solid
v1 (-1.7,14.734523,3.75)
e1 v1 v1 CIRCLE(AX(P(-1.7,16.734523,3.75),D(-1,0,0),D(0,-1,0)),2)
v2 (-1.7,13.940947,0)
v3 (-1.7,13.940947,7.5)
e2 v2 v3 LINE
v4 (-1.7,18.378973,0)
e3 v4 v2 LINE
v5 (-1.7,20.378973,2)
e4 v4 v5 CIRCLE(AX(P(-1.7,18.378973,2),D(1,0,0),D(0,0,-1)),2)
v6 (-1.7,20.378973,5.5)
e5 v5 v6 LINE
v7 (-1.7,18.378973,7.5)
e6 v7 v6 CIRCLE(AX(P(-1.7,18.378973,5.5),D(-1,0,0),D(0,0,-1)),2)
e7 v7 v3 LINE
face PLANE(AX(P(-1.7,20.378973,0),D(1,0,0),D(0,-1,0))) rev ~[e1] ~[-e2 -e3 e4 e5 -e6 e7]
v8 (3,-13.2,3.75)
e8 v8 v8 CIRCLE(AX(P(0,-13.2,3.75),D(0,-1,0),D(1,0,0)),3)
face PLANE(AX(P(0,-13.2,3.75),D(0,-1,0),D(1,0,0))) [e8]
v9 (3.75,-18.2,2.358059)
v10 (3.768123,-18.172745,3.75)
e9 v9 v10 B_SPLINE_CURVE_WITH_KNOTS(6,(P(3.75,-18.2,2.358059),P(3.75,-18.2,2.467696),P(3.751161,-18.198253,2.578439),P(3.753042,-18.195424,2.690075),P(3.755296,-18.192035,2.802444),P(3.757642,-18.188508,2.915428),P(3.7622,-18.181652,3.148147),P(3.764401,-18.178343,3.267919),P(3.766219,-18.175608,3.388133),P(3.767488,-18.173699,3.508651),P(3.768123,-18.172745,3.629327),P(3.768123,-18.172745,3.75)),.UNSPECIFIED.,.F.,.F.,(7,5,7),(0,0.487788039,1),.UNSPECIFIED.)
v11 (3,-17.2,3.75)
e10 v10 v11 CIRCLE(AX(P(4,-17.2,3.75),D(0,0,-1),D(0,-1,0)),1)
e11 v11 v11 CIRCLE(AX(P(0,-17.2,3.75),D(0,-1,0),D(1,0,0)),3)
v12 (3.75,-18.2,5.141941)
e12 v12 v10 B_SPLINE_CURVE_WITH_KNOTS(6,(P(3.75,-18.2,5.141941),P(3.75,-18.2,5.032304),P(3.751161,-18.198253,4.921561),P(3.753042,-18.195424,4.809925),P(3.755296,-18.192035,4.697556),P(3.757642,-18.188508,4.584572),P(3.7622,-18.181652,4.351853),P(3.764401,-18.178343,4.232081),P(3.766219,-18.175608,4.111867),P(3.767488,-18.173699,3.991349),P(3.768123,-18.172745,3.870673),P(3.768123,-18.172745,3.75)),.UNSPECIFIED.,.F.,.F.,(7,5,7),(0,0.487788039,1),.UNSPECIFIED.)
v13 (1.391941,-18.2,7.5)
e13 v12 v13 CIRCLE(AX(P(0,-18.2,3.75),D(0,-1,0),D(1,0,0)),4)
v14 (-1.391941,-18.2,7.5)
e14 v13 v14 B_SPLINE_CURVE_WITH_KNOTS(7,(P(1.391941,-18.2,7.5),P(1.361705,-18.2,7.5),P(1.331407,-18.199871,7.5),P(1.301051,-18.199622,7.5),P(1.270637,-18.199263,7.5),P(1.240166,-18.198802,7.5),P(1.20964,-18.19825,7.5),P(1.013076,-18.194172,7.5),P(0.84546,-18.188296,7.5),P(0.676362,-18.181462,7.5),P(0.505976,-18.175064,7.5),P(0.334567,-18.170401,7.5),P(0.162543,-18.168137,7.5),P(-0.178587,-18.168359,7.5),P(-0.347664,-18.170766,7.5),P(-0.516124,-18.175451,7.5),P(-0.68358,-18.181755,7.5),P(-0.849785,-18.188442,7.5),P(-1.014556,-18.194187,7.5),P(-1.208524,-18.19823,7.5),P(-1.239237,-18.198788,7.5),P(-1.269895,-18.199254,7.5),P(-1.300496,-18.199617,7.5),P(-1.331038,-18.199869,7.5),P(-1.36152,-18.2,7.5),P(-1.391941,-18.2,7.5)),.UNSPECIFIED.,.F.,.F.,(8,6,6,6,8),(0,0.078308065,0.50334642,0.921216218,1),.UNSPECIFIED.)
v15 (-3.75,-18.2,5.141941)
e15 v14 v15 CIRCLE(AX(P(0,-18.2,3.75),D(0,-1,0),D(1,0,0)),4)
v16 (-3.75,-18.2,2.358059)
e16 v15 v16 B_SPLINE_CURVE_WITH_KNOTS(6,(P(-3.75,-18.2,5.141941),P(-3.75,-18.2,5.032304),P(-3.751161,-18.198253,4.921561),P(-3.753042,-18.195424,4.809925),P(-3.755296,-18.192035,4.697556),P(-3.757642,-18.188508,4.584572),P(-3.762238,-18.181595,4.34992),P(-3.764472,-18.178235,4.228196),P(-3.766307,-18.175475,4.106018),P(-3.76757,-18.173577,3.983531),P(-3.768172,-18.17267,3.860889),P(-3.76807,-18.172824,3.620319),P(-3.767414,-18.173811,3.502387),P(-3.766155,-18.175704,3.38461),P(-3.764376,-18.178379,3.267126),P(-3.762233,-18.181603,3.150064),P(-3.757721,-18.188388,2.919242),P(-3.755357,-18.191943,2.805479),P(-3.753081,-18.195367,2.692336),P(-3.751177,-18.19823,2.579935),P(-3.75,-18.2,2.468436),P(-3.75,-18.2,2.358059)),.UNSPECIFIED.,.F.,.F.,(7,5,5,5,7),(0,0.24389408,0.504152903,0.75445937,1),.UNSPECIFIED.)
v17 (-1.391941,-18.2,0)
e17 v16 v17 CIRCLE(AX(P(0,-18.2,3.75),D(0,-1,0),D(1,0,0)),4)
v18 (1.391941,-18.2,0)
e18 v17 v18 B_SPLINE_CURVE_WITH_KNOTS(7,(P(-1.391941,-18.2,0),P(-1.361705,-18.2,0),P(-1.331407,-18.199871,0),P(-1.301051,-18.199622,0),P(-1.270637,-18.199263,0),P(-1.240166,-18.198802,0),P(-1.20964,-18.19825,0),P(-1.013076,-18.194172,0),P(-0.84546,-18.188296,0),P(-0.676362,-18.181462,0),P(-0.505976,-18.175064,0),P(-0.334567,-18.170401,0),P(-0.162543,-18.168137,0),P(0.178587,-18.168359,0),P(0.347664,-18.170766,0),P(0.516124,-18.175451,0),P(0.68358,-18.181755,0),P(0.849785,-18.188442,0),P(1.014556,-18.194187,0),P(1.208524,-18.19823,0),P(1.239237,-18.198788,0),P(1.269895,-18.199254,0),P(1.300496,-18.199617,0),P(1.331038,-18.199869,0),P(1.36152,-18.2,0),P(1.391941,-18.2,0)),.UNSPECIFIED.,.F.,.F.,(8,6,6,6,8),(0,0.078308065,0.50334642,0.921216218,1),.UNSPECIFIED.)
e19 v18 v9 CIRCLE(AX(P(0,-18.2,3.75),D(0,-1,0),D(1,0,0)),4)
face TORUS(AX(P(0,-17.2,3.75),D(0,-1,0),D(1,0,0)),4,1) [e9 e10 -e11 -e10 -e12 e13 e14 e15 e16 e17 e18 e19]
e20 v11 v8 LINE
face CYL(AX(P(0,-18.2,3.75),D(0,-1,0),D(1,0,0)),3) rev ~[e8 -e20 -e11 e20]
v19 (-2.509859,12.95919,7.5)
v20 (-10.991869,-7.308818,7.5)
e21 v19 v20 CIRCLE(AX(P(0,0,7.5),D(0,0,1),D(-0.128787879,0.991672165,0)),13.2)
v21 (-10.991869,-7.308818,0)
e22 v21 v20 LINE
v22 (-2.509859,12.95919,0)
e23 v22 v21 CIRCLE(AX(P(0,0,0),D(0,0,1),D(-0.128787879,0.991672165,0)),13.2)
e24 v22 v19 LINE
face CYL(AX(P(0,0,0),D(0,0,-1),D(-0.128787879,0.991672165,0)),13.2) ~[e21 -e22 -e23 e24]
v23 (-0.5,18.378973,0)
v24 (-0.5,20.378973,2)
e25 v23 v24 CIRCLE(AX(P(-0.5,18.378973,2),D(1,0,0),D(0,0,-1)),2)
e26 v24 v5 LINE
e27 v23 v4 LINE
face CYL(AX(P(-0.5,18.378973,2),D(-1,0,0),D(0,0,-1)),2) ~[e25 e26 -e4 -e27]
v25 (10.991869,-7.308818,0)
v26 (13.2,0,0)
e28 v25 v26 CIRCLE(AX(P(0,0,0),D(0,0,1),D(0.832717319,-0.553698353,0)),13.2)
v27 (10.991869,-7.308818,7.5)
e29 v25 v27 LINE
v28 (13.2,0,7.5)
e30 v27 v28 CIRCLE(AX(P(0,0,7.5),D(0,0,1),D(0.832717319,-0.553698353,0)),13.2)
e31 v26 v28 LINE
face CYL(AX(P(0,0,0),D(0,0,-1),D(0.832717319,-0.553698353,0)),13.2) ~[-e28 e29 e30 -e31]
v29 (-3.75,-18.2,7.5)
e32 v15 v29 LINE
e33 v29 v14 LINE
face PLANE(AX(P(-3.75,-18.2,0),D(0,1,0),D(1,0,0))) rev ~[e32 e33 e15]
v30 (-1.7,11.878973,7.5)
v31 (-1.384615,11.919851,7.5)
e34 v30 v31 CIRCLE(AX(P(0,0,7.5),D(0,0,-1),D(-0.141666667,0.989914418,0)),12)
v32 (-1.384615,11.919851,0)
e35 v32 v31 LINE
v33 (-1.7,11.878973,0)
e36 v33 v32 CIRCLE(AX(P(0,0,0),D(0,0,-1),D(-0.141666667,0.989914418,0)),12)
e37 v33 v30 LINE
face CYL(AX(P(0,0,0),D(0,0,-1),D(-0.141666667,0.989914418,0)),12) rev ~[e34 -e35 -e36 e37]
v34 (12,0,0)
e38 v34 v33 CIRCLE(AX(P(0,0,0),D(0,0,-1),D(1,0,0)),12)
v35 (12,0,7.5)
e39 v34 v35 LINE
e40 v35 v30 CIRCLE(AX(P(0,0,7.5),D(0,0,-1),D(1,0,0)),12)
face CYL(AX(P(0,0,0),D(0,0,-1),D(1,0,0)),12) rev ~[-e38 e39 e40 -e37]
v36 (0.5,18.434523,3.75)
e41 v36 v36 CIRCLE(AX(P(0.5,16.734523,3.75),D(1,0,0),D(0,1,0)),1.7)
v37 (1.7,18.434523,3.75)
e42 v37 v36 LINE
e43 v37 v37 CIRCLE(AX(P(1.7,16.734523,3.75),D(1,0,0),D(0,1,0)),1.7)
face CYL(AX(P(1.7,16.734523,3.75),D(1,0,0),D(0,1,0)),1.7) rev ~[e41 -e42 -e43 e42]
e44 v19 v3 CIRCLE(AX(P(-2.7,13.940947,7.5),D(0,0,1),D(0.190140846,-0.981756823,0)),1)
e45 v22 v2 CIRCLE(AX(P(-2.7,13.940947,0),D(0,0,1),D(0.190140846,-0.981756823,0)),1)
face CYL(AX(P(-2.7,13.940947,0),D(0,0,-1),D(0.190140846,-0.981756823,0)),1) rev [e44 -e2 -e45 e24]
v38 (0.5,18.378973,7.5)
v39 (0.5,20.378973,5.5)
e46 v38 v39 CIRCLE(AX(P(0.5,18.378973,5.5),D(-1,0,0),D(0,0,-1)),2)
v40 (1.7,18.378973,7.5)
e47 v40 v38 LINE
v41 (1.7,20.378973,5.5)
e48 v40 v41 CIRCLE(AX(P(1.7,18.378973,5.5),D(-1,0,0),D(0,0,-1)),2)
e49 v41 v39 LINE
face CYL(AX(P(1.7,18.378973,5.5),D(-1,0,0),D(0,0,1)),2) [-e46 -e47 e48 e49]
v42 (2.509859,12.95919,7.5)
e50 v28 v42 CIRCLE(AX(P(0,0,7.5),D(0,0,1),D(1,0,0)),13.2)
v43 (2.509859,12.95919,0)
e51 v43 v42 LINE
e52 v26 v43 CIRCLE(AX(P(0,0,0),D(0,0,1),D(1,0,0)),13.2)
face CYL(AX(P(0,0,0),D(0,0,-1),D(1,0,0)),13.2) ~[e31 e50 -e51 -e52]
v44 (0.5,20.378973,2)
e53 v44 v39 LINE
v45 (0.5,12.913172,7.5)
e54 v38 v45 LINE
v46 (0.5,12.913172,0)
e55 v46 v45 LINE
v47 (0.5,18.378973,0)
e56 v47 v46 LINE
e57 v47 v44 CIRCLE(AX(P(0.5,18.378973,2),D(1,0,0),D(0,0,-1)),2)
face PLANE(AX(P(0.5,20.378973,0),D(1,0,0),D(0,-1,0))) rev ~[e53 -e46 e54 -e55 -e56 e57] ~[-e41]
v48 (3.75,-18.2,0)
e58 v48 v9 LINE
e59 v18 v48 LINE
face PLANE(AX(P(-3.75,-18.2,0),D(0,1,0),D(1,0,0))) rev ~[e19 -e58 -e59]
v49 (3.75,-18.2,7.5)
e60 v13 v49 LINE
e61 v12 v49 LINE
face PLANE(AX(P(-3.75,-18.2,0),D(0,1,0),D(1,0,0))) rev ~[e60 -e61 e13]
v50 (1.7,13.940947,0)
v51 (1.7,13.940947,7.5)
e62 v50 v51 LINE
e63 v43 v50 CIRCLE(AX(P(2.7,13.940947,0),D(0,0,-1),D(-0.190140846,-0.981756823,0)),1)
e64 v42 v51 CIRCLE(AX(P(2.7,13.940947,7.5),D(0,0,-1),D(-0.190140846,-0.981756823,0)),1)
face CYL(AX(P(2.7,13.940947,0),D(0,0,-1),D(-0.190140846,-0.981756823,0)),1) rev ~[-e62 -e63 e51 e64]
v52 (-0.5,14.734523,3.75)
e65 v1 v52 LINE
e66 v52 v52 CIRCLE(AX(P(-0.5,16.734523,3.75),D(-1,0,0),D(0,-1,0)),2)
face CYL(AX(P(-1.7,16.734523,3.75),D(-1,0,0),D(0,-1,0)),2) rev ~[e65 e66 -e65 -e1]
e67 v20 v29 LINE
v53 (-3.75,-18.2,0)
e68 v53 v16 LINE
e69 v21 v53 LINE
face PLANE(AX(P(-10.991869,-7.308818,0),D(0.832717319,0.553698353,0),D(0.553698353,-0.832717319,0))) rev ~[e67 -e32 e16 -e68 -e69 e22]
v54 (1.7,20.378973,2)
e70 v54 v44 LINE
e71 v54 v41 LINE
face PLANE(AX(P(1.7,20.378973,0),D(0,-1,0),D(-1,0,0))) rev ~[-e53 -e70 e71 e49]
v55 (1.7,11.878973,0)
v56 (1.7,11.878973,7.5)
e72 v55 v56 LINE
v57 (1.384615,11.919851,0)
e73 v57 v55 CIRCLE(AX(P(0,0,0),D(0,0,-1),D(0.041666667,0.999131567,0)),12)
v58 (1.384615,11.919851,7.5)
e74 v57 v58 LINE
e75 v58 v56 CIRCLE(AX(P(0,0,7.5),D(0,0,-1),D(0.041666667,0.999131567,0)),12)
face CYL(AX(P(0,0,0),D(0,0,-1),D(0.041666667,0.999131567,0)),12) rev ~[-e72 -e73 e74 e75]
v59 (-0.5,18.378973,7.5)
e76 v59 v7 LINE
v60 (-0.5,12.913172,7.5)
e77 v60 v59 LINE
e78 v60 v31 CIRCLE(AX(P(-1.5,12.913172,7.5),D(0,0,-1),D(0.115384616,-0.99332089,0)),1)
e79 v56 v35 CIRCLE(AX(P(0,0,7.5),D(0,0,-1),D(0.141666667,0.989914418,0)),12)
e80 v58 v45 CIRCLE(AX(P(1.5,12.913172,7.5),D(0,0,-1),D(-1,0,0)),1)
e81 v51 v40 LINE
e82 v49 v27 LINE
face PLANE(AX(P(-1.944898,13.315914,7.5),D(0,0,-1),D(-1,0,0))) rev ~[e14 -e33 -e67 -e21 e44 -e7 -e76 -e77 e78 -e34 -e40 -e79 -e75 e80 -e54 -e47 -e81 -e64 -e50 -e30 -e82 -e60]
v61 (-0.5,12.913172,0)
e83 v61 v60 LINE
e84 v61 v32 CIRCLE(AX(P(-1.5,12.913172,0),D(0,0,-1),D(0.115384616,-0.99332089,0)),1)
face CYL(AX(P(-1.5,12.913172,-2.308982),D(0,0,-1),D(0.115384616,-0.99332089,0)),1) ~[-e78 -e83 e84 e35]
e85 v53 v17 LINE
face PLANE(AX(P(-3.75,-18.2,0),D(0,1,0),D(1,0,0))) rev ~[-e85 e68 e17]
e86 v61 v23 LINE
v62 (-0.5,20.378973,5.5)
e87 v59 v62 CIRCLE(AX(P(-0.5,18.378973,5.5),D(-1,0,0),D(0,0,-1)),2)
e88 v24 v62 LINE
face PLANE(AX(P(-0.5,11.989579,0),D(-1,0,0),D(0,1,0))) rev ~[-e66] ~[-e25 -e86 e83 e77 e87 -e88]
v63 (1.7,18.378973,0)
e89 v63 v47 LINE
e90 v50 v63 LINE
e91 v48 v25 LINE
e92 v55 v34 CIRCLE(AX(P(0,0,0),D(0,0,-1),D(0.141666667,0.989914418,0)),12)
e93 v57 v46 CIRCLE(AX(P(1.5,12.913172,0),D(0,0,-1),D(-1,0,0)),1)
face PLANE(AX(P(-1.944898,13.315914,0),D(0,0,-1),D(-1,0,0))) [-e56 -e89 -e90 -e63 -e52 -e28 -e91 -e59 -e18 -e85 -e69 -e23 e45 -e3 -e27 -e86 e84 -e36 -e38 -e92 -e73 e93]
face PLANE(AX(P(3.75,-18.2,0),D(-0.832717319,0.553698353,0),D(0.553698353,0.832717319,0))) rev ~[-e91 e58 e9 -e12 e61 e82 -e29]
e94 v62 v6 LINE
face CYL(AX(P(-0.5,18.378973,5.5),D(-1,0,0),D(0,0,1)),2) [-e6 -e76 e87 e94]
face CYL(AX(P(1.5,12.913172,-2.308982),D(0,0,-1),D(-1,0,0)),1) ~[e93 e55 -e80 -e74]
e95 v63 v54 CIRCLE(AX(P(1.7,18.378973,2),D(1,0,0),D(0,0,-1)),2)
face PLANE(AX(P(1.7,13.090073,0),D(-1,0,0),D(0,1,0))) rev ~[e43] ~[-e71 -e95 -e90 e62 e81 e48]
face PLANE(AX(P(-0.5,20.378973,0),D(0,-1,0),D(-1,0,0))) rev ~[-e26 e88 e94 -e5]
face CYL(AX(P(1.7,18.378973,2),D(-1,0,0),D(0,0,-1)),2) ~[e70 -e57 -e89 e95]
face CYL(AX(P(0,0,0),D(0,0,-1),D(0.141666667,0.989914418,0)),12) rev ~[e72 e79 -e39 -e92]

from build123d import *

# Parameters (mm, degrees)
F1_DEPTH    = 7.5
F2_R        = 3
F3_DEPTH    = 5
F4_R        = 2
F5_DEPTH    = 1.2
F6_R        = 1.7
F7_DEPTH    = 1.2
F8_T1_DEPTH = 7.5
F8_T3_DEPTH = 12.1179638093
F9_R        = 2


# Not quite as in the source:
# - a fillet or chamfer that OpenCascade refuses, or shapes differently, is made with other operations: its cross-section is extruded or revolved along the edge and cut away or added


with BuildPart() as f1:
    # F0 (on Top) → F1 (new body)
    with BuildSketch(Plane.XY):
        with BuildLine():
            ThreePointArc((10.9918685576, -7.3088182167), (0, -13.1999999285), (-10.9918685576, -7.3088182167))
            Line((-10.9918685576, -7.3088182167), (-3.75, -18.1999999285))
            Line((-3.75, -18.1999999285), (3.75, -18.1999999285))
            Line((3.75, -18.1999999285), (10.9918685576, -7.3088182167))
        make_face()
        with BuildLine():
            ThreePointArc((1.7, 11.8789730196), (9.0664215653, 7.8612976028), (12, 0))
            ThreePointArc((12, 0), (-7.8612976028, -9.0664215653), (-1.7, 11.8789730196))
            Line((-1.7, 11.8789730196), (-1.7, 13.0900725022))
            ThreePointArc((-1.7, 13.0900725022), (-12.0124754947, 5.4717849557), (-10.9918685576, -7.3088182167))
            ThreePointArc((-10.9918685576, -7.3088182167), (0, -13.1999999285), (10.9918685576, -7.3088182167))
            ThreePointArc((10.9918685576, -7.3088182167), (12.6359143374, -3.8175472451), (13.1999999285, 0))
            ThreePointArc((13.1999999285, 0), (9.9166526104, 8.7120605552), (1.7, 13.0900725022))
            Line((1.7, 13.0900725022), (1.7, 11.8789730196))
        make_face()
        with BuildLine():
            ThreePointArc((0.5, 13.1905268322), (1.1011461157, 13.1539908523), (1.7, 13.0900725022))
            Line((1.7, 13.0900725022), (1.7, 20.3789730196))
            Line((1.7, 20.3789730196), (0.5, 20.3789730196))
            Line((0.5, 20.3789730196), (0.5, 13.1905268322))
        make_face()
        with BuildLine():
            Line((-1.7, 20.3789730196), (-1.7, 13.0900725022))
            ThreePointArc((-1.7, 13.0900725022), (-1.1011461157, 13.1539908523), (-0.5, 13.1905268322))
            Line((-0.5, 13.1905268322), (-0.5, 20.3789730196))
            Line((-0.5, 20.3789730196), (-1.7, 20.3789730196))
        make_face()
        with BuildLine():
            Line((-1.7, 13.0900725022), (-1.7, 11.8789730196))
            ThreePointArc((-1.7, 11.8789730196), (-1.1013893091, 11.9493490028), (-0.5, 11.9895788083))
            Line((-0.5, 11.9895788083), (-0.5, 13.1905268322))
            ThreePointArc((-0.5, 13.1905268322), (-1.1011461157, 13.1539908523), (-1.7, 13.0900725022))
        make_face()
        with BuildLine():
            ThreePointArc((0.5, 11.9895788083), (1.1013893091, 11.9493490028), (1.7, 11.8789730196))
            Line((1.7, 11.8789730196), (1.7, 13.0900725022))
            ThreePointArc((1.7, 13.0900725022), (1.1011461157, 13.1539908523), (0.5, 13.1905268322))
            Line((0.5, 13.1905268322), (0.5, 11.9895788083))
        make_face()
    extrude(amount=F1_DEPTH)

    # F2 (on face) → F3 (cut)
    with BuildSketch(Plane.XZ.offset(18.1999999285)):
        with Locations((0, 3.75)):
            Circle(F2_R)
    extrude(amount=-F3_DEPTH, mode=Mode.SUBTRACT)

    # F4 (on face) → F5 (cut, through all)
    with BuildSketch(Plane(origin=(-1.7, 0, 0), x_dir=(0, -1, 0), z_dir=(-1, 0, 0))):
        with Locations((-16.7345227609, 3.75)):
            Circle(F4_R)
    extrude(amount=-F5_DEPTH, mode=Mode.SUBTRACT)

    # F6 (on face) → F7 (cut, through all)
    with BuildSketch(Plane.YZ.offset(1.7)):
        with Locations((16.7345227609, 3.75)):
            Circle(F6_R)
    extrude(amount=-F7_DEPTH, mode=Mode.SUBTRACT)

    # F8: fillet of radius 1 on 5 edges, made by hand

    # F8_s2 → F8_t1 (join)
    with BuildSketch(Plane.XY):
        with BuildLine():
            ThreePointArc((-2.509859154, 12.9591899878), (-1.9285919219, 13.3046060392), (-1.7, 13.9409468103))
            Line((-1.7, 13.9409468103), (-1.7, 13.0900725022))
            ThreePointArc((-1.7, 13.0900725022), (-2.1059466, 13.0309242585), (-2.509859154, 12.9591899878))
        make_face()
        with BuildLine():
            ThreePointArc((2.509859154, 12.9591899878), (1.9285919219, 13.3046060392), (1.7, 13.9409468103))
            Line((1.7, 13.9409468103), (1.7, 13.0900725022))
            ThreePointArc((1.7, 13.0900725022), (2.1059466, 13.0309242585), (2.509859154, 12.9591899878))
        make_face()
    extrude(amount=F8_T1_DEPTH)

    # F8_s4 → F8_t3 (cut)
    with BuildSketch(Plane.XY.offset(-2.3089819047)):
        with BuildLine():
            ThreePointArc((-1.3846153846, 11.9198506801), (-0.7532120062, 12.2481093984), (-0.5, 12.9131715701))
            Line((-0.5, 12.9131715701), (-0.5, 11.9895788083))
            ThreePointArc((-0.5, 11.9895788083), (-0.9429524325, 11.9628943283), (-1.3846153846, 11.9198506801))
        make_face()
        with BuildLine():
            ThreePointArc((0.5, 12.9131715701), (0.7532120062, 12.2481093984), (1.3846153846, 11.9198506801))
            ThreePointArc((1.3846153846, 11.9198506801), (0.9429524325, 11.9628943283), (0.5, 11.9895788083))
            Line((0.5, 11.9895788083), (0.5, 12.9131715701))
        make_face()
    extrude(amount=F8_T3_DEPTH, mode=Mode.SUBTRACT)

    # F8_s5 → F8_t6 (revolve, cut)
    with BuildSketch(Plane.XY.offset(3.75)):
        with BuildLine():
            ThreePointArc((4, -18.1999999285), (3.2928932188, -17.9071067097), (3, -17.1999999285))
            Line((3, -17.1999999285), (3, -18.1999999285))
            Line((3, -18.1999999285), (4, -18.1999999285))
        make_face()
    revolve(axis=Axis((0, -18.1999999285, 3.75), (0, -1, 0)), mode=Mode.SUBTRACT)

    # F9
    f9_edges = [f1.edges().sort_by_distance(p)[0] for p in [
        (-1.1, 20.378973, 7.5),
        (1.1, 20.378973, 7.5),
        (1.1, 20.378973, 0),
        (-1.1, 20.378973, 0),
    ]]
    fillet(f9_edges, radius=F9_R)


solid = f1.part
